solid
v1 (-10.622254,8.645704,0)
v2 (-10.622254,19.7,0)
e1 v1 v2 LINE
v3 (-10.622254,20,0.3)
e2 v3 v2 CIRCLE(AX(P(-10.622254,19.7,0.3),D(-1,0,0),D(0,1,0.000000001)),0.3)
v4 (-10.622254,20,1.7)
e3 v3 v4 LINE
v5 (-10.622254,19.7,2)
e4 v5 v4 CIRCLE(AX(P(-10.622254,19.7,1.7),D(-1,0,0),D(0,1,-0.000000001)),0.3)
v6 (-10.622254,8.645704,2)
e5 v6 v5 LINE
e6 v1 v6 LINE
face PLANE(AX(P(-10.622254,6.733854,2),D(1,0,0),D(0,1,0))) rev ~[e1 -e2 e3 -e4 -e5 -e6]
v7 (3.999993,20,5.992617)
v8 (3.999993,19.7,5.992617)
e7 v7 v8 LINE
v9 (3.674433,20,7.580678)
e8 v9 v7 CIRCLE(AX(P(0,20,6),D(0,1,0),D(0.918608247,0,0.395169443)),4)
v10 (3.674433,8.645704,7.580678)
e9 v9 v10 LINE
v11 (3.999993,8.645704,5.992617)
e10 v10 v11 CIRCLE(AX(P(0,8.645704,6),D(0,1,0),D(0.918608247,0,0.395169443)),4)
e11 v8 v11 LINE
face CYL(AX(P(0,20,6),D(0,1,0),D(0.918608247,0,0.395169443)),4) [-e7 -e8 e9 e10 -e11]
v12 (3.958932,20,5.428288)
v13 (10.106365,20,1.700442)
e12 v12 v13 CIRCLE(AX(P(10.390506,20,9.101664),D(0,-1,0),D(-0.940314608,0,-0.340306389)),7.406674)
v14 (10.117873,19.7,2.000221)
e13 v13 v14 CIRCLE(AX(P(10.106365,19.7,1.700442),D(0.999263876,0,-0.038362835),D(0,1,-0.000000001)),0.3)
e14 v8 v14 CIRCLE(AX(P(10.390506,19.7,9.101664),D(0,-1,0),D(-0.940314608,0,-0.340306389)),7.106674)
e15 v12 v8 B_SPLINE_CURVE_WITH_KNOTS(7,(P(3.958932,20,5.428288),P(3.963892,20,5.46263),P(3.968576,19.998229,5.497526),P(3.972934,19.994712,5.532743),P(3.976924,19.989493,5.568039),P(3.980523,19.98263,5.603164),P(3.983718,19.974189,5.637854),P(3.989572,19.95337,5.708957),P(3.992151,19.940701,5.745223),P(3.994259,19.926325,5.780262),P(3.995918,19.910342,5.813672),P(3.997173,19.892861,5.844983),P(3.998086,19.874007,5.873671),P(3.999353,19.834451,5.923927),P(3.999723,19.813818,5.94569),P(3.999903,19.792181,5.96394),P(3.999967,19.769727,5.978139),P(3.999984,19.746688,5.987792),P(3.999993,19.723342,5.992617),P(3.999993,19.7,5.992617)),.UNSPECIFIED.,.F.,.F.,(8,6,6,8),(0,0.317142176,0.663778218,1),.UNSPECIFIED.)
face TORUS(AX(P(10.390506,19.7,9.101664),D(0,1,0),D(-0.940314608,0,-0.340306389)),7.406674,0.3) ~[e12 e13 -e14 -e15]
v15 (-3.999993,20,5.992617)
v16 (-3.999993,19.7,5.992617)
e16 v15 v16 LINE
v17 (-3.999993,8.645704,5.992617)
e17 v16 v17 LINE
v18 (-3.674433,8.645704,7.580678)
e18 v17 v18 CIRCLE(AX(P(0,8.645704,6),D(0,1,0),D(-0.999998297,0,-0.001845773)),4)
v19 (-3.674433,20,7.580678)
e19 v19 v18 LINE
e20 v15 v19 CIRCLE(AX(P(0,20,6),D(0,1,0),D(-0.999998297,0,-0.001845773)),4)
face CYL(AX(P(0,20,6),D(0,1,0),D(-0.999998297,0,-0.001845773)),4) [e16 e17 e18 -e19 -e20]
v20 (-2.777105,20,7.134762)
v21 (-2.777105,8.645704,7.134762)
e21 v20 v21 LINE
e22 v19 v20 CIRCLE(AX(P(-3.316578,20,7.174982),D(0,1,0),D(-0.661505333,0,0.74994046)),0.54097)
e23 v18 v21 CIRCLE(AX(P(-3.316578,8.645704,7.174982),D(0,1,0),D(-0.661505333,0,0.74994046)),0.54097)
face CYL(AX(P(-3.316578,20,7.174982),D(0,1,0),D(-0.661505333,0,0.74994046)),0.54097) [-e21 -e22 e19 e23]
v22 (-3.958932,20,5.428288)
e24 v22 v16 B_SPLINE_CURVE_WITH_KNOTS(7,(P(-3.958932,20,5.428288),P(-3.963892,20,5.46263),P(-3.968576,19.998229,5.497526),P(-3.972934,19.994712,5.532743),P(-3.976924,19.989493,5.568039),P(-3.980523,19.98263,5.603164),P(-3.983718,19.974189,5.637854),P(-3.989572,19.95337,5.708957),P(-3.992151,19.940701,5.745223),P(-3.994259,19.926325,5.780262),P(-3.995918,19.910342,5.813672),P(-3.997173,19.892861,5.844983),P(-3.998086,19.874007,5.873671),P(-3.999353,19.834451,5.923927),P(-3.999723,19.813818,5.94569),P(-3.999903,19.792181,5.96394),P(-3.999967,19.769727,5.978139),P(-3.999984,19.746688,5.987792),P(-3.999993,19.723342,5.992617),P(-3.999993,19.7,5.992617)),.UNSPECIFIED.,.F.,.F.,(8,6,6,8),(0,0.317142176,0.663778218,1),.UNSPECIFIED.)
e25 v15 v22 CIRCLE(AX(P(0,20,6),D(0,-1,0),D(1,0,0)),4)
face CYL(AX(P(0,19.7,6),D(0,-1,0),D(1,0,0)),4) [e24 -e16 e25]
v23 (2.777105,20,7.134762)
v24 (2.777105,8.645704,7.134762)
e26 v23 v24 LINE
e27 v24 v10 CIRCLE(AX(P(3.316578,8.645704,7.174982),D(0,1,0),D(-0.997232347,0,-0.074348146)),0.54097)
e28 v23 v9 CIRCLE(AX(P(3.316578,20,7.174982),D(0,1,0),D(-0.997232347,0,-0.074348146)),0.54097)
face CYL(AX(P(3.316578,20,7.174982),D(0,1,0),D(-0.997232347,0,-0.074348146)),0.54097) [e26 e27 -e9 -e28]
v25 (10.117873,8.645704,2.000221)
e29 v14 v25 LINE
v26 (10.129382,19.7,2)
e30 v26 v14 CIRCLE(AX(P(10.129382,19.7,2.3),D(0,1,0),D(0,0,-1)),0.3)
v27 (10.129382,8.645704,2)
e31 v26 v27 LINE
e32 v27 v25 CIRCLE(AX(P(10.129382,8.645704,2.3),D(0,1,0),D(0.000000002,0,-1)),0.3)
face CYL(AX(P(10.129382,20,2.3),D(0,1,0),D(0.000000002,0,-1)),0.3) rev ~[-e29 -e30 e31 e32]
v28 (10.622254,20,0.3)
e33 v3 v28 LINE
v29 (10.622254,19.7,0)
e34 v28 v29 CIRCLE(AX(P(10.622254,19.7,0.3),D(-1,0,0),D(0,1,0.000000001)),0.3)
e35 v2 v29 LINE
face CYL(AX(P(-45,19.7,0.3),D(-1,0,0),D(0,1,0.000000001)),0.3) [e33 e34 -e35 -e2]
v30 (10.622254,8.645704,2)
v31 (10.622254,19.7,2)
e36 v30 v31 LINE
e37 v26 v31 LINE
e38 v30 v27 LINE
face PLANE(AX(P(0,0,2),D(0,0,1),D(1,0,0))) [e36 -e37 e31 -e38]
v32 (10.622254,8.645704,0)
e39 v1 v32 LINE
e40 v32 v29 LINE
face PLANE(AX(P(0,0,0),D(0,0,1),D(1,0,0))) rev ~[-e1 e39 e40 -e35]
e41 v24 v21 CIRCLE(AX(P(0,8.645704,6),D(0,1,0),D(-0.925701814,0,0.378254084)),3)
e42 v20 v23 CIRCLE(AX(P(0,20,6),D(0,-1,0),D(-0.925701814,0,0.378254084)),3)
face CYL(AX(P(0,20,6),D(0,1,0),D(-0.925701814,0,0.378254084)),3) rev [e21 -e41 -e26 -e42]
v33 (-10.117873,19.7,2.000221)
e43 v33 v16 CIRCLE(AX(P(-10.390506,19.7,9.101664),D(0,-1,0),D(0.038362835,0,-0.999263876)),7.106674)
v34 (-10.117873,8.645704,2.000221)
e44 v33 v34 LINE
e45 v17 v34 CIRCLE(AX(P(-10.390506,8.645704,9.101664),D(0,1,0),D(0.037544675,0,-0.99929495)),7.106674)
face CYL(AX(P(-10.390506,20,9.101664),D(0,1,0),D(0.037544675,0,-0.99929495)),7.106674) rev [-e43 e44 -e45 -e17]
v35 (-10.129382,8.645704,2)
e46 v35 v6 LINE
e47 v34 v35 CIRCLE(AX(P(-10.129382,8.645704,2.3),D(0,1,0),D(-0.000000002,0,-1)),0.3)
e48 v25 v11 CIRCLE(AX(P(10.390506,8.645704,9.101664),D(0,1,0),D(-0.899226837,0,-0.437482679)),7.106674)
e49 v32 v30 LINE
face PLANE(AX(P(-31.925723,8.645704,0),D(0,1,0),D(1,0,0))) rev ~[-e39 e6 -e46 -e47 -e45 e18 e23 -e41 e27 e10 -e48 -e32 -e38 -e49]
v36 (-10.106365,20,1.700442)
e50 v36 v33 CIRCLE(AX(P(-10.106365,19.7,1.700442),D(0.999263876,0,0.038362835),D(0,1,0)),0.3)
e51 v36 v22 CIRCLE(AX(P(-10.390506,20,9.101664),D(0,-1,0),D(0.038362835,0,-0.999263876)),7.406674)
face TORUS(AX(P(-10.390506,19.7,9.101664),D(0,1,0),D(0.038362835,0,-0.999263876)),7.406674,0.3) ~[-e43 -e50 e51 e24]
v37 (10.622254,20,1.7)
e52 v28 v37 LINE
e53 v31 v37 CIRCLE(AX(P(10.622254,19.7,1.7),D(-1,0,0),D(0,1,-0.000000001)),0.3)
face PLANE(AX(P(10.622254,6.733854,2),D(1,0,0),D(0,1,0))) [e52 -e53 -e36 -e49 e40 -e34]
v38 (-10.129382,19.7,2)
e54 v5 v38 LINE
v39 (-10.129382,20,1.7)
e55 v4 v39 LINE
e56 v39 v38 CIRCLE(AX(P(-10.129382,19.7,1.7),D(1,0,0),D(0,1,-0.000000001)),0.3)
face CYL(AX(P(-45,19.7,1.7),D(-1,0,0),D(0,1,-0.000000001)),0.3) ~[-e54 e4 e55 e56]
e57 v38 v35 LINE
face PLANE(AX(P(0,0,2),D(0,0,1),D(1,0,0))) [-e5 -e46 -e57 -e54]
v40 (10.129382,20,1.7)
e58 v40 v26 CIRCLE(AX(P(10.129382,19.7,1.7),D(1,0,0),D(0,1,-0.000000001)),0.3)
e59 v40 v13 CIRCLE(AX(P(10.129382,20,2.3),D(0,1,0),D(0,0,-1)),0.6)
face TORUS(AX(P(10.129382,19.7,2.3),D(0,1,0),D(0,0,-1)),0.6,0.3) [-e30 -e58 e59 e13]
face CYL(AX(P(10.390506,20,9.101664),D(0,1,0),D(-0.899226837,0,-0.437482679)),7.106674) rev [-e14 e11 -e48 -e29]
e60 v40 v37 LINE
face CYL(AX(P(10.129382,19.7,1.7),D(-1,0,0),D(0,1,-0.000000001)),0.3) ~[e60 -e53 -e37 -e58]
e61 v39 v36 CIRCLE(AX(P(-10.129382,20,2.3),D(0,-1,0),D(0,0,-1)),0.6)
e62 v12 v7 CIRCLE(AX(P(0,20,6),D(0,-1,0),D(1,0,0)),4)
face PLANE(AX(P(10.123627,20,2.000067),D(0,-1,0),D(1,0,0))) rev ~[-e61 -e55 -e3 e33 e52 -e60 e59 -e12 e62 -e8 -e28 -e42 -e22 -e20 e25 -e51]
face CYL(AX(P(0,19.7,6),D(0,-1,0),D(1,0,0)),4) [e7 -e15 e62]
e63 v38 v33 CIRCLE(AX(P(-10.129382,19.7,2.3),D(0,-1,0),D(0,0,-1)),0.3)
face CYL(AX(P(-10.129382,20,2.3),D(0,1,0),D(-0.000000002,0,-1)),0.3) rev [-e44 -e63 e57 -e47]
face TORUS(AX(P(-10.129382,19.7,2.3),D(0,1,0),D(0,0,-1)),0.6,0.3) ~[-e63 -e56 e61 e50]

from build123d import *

# Parameters (mm, degrees)
F1_DEPTH     = 2
F3_DEPTH     = 40
F4_T1_DEPTH  = 40
F4_T3_DEPTH  = 90
F4_T5_DEPTH  = 20
F4_T8_ANGLE  = 90
F4_T10_ANGLE = 90
F4_T12_ANGLE = 90
F4_T14_ANGLE = 90
F4_T15_DEPTH = 20
F4_T17_DEPTH = 34.8706177507
F4_T19_DEPTH = 34.8706177507
F4_T22_ANGLE = 90
F4_T24_ANGLE = 90
F4_T26_ANGLE = 90
F4_T28_ANGLE = 90
F4_T32_ANGLE = 67.9058899257
F4_S33_R     = 4
F4_T34_DEPTH = 6
F4_T38_ANGLE = 67.9058899257
F4_S39_R     = 4
F4_T40_DEPTH = 6
F4_T42_ANGLE = 2.1985680139
F4_T44_ANGLE = 2.1985680139
F4_T46_ANGLE = 145.4380511244
F4_T48_ANGLE = 145.4380511244
F5_W         = 47.7962438017
F5_H         = 14.3843935803
F6_DEPTH     = 25
F7_W         = 52.0751457661
F7_H         = 31.3179213554
F8_DEPTH     = 25


# Not quite as in the source:
# - a fillet or chamfer that OpenCascade refuses, or shapes differently, is made with other operations: its cross-section is extruded or revolved along the edge and cut away or added


with BuildPart() as f1:
    # F0 (on Top) → F1 (new body)
    with BuildSketch(Plane.XY):
        with BuildLine():
            Line((45, 20), (-45, 20))
            ThreePointArc((-45, 20), (-52.0710678119, 17.0710678119), (-55, 10))
            Line((-55, 10), (-55, -10))
            ThreePointArc((-55, -10), (-52.0710678119, -17.0710678119), (-45, -20))
            Line((-45, -20), (45, -20))
            ThreePointArc((45, -20), (52.0710678119, -17.0710678119), (55, -10))
            Line((55, -10), (55, 10))
            ThreePointArc((55, 10), (52.0710678119, 17.0710678119), (45, 20))
        make_face()
    extrude(amount=F1_DEPTH)

    # F2 (on face) → F3 (join, through all)
    with BuildSketch(Plane(origin=(0, 20, 0), x_dir=(-1, 0, 0), z_dir=(0, 1, 0))):
        with BuildLine():
            ThreePointArc((2.7771054409, 7.1347622527), (0, 3), (-2.7771054409, 7.1347622527))
            ThreePointArc((-2.7771054409, 7.1347622527), (-3.0758368725, 7.6594328143), (-3.674432988, 7.5806777712))
            ThreePointArc((-3.674432988, 7.5806777712), (-3.9185059144, 6.8033127653), (-3.9999931862, 5.9926169097))
            ThreePointArc((-3.9999931862, 5.9926169097), (-6.509106512, 3.1485501635), (-10.1236877963, 2))
            Line((-10.1236877963, 2), (10.1236877963, 2))
            ThreePointArc((10.1236877963, 2), (6.509106512, 3.1485501635), (3.9999931862, 5.9926169097))
            ThreePointArc((3.9999931862, 5.9926169097), (3.9185059144, 6.8033127653), (3.674432988, 7.5806777712))
            ThreePointArc((3.674432988, 7.5806777712), (3.0758368725, 7.6594328143), (2.7771054409, 7.1347622527))
        make_face()
    extrude(amount=-F3_DEPTH)

    # F4: fillet of radius 0.3 on 22 edges, made by hand

    # F4_s2 → F4_t1 (join)
    with BuildSketch(Plane.XZ.offset(-20)):
        with BuildLine():
            ThreePointArc((10.1293822493, 2), (10.1236267648, 2.0000552144), (10.1178733989, 2.0002208373))
            ThreePointArc((10.1178733989, 2.0002208373), (10.120780575, 2.0001098236), (10.1236877963, 2))
            Line((10.1236877963, 2), (10.1293822493, 2))
        make_face()
        with BuildLine():
            ThreePointArc((-10.1293822493, 2), (-10.1236267648, 2.0000552144), (-10.1178733989, 2.0002208373))
            ThreePointArc((-10.1178733989, 2.0002208373), (-10.120780575, 2.0001098236), (-10.1236877963, 2))
            Line((-10.1236877963, 2), (-10.1293822493, 2))
        make_face()
    extrude(amount=F4_T1_DEPTH)

    # F4_s4 → F4_t3 (cut)
    with BuildSketch(Plane.YZ.offset(-45)):
        with BuildLine():
            ThreePointArc((20, 0.3), (19.9121320344, 0.0878679656), (19.7, 0))
            Line((19.7, 0), (20, 0))
            Line((20, 0), (20, 0.3))
        make_face()
        with BuildLine():
            ThreePointArc((-19.7, 0), (-19.9121320344, 0.0878679656), (-20, 0.3))
            Line((-20, 0.3), (-20, 0))
            Line((-20, 0), (-19.7, 0))
        make_face()
    extrude(amount=F4_T3_DEPTH, mode=Mode.SUBTRACT)

    # F4_s6 → F4_t5 (cut)
    with BuildSketch(Plane.XZ.offset(-10)):
        with BuildLine():
            ThreePointArc((-54.7, 0), (-54.9121320344, 0.0878679656), (-55, 0.3))
            Line((-55, 0.3), (-55, 0))
            Line((-55, 0), (-54.7, 0))
        make_face()
        with BuildLine():
            ThreePointArc((54.7, 0), (54.9121320344, 0.0878679656), (55, 0.3))
            Line((55, 0.3), (55, 0))
            Line((55, 0), (54.7, 0))
        make_face()
    extrude(amount=F4_T5_DEPTH, mode=Mode.SUBTRACT)

    # F4_s7 → F4_t8 (revolve, cut)
    with BuildSketch(Plane.YZ.offset(-45)):
        with BuildLine():
            ThreePointArc((20, 0.3), (19.9121320344, 0.0878679656), (19.7, 0))
            Line((19.7, 0), (20, 0))
            Line((20, 0), (20, 0.3))
        make_face()
    revolve(axis=Axis((-45, 10, 0), (0, 0, 1)), revolution_arc=F4_T8_ANGLE, mode=Mode.SUBTRACT)

    # F4_s9 → F4_t10 (revolve, cut)
    with BuildSketch(Plane.XZ.offset(10)):
        with BuildLine():
            ThreePointArc((-54.7, 0), (-54.9121320344, 0.0878679656), (-55, 0.3))
            Line((-55, 0.3), (-55, 0))
            Line((-55, 0), (-54.7, 0))
        make_face()
    revolve(axis=Axis((-45, -10, 0), (0, 0, 1)), revolution_arc=F4_T10_ANGLE, mode=Mode.SUBTRACT)

    # F4_s11 → F4_t12 (revolve, cut)
    with BuildSketch(Plane.YZ.offset(45)):
        with BuildLine():
            ThreePointArc((-19.7, 0), (-19.9121320344, 0.0878679656), (-20, 0.3))
            Line((-20, 0.3), (-20, 0))
            Line((-20, 0), (-19.7, 0))
        make_face()
    revolve(axis=Axis((45, -10, 0), (0, 0, 1)), revolution_arc=F4_T12_ANGLE, mode=Mode.SUBTRACT)

    # F4_s13 → F4_t14 (revolve, cut)
    with BuildSketch(Plane.XZ.offset(-10)):
        with BuildLine():
            ThreePointArc((55, 0.3), (54.9121320344, 0.0878679656), (54.7, 0))
            Line((54.7, 0), (55, 0))
            Line((55, 0), (55, 0.3))
        make_face()
    revolve(axis=Axis((45, 10, 0), (0, 0, 1)), revolution_arc=F4_T14_ANGLE, mode=Mode.SUBTRACT)

    # F4_s16 → F4_t15 (cut)
    with BuildSketch(Plane.XZ.offset(-10)):
        with BuildLine():
            ThreePointArc((54.7, 2), (54.9121320344, 1.9121320344), (55, 1.7))
            Line((55, 1.7), (55, 2))
            Line((55, 2), (54.7, 2))
        make_face()
        with BuildLine():
            ThreePointArc((-54.7, 2), (-54.9121320344, 1.9121320344), (-55, 1.7))
            Line((-55, 1.7), (-55, 2))
            Line((-55, 2), (-54.7, 2))
        make_face()
    extrude(amount=F4_T15_DEPTH, mode=Mode.SUBTRACT)

    # F4_s18 → F4_t17 (cut)
    with BuildSketch(Plane.YZ.offset(10.1293822493)):
        with BuildLine():
            ThreePointArc((-19.7, 2), (-19.9121320344, 1.9121320344), (-20, 1.7))
            Line((-20, 1.7), (-20, 2))
            Line((-20, 2), (-19.7, 2))
        make_face()
        with BuildLine():
            ThreePointArc((20, 1.7), (19.9121320344, 1.9121320344), (19.7, 2))
            Line((19.7, 2), (20, 2))
            Line((20, 2), (20, 1.7))
        make_face()
    extrude(amount=F4_T17_DEPTH, mode=Mode.SUBTRACT)

    # F4_s20 → F4_t19 (cut)
    with BuildSketch(Plane.YZ.offset(-45)):
        with BuildLine():
            ThreePointArc((-19.7, 2), (-19.9121320344, 1.9121320344), (-20, 1.7))
            Line((-20, 1.7), (-20, 2))
            Line((-20, 2), (-19.7, 2))
        make_face()
        with BuildLine():
            ThreePointArc((20, 1.7), (19.9121320344, 1.9121320344), (19.7, 2))
            Line((19.7, 2), (20, 2))
            Line((20, 2), (20, 1.7))
        make_face()
    extrude(amount=F4_T19_DEPTH, mode=Mode.SUBTRACT)

    # F4_s21 → F4_t22 (revolve, cut)
    with BuildSketch(Plane.XZ.offset(-10)):
        with BuildLine():
            ThreePointArc((54.7, 2), (54.9121320344, 1.9121320344), (55, 1.7))
            Line((55, 1.7), (55, 2))
            Line((55, 2), (54.7, 2))
        make_face()
    revolve(axis=Axis((45, 10, 2), (0, 0, 1)), revolution_arc=F4_T22_ANGLE, mode=Mode.SUBTRACT)

    # F4_s23 → F4_t24 (revolve, cut)
    with BuildSketch(Plane.YZ.offset(45)):
        with BuildLine():
            ThreePointArc((-19.7, 2), (-19.9121320344, 1.9121320344), (-20, 1.7))
            Line((-20, 1.7), (-20, 2))
            Line((-20, 2), (-19.7, 2))
        make_face()
    revolve(axis=Axis((45, -10, 2), (0, 0, 1)), revolution_arc=F4_T24_ANGLE, mode=Mode.SUBTRACT)

    # F4_s25 → F4_t26 (revolve, cut)
    with BuildSketch(Plane.XZ.offset(10)):
        with BuildLine():
            ThreePointArc((-54.7, 2), (-54.9121320344, 1.9121320344), (-55, 1.7))
            Line((-55, 1.7), (-55, 2))
            Line((-55, 2), (-54.7, 2))
        make_face()
    revolve(axis=Axis((-45, -10, 2), (0, 0, 1)), revolution_arc=F4_T26_ANGLE, mode=Mode.SUBTRACT)

    # F4_s27 → F4_t28 (revolve, cut)
    with BuildSketch(Plane.YZ.offset(-45)):
        with BuildLine():
            ThreePointArc((20, 1.7), (19.9121320344, 1.9121320344), (19.7, 2))
            Line((19.7, 2), (20, 2))
            Line((20, 2), (20, 1.7))
        make_face()
    revolve(axis=Axis((-45, 10, 2), (0, 0, 1)), revolution_arc=F4_T28_ANGLE, mode=Mode.SUBTRACT)


with BuildPart() as f4_tool30:
    # F4_s31 → F4_t32 (revolve)
    with BuildSketch(Plane(origin=(-1.7091793366, 0, 4.7227038559), x_dir=(0, 1, 0), z_dir=(-0.3403063894, 0, 0.9403146076))):
        with BuildLine():
            ThreePointArc((20, -5.4610241004), (19.9121320344, -5.6731561348), (19.7, -5.7610241004))
            Line((19.7, -5.7610241004), (20, -5.7610241004))
            Line((20, -5.7610241004), (20, -5.4610241004))
        make_face()
    revolve(axis=Axis((10.3905055755, 20, 9.1016638887), (0, -1, 0)), revolution_arc=F4_T32_ANGLE)

    # F4_s33 → F4_t34 (cut, symmetric)
    with BuildSketch(Plane.XZ.offset(-19.7)):
        with Locations((0, 6)):
            Circle(F4_S33_R)
    extrude(amount=F4_T34_DEPTH, both=True, mode=Mode.SUBTRACT)


with BuildPart() as f1_1:
    add(f1.part)

    # F4_t29: cut F4_tool30
    add(f4_tool30.part, mode=Mode.SUBTRACT)


with BuildPart() as f4_tool36:
    # F4_s37 → F4_t38 (revolve)
    with BuildSketch(Plane(origin=(-10.0263051977, 0, -0.3849208379), x_dir=(0, 1, 0), z_dir=(-0.9992638755, 0, -0.0383628346))):
        with BuildLine():
            ThreePointArc((20, -2.0868987298), (19.9121320344, -2.2990307641), (19.7, -2.3868987298))
            Line((19.7, -2.3868987298), (20, -2.3868987298))
            Line((20, -2.3868987298), (20, -2.0868987298))
        make_face()
    revolve(axis=Axis((-10.3905055755, 20, 9.1016638887), (0, -1, 0)), revolution_arc=F4_T38_ANGLE)

    # F4_s39 → F4_t40 (cut, symmetric)
    with BuildSketch(Plane.XZ.offset(-19.7)):
        with Locations((0, 6)):
            Circle(F4_S39_R)
    extrude(amount=F4_T40_DEPTH, both=True, mode=Mode.SUBTRACT)


with BuildPart() as f1_2:
    add(f1_1.part)

    # F4_t35: cut F4_tool36
    add(f4_tool36.part, mode=Mode.SUBTRACT)

    # F4_s41 → F4_t42 (revolve, cut)
    with BuildSketch(Plane.YZ.offset(-10.1293822493)):
        with BuildLine():
            ThreePointArc((20, 1.7), (19.9121320344, 1.9121320344), (19.7, 2))
            Line((19.7, 2), (20, 2))
            Line((20, 2), (20, 1.7))
        make_face()
    revolve(axis=Axis((-10.1293822493, 20, 2.3), (0, -1, 0)), revolution_arc=F4_T42_ANGLE, mode=Mode.SUBTRACT)

    # F4_s43 → F4_t44 (revolve, cut)
    with BuildSketch(Plane.YZ.offset(10.1293822493)):
        with BuildLine():
            ThreePointArc((20, 1.7), (19.9121320344, 1.9121320344), (19.7, 2))
            Line((19.7, 2), (20, 2))
            Line((20, 2), (20, 1.7))
        make_face()
    revolve(axis=Axis((10.1293822493, 20, 2.3), (0, 1, 0)), revolution_arc=F4_T44_ANGLE, mode=Mode.SUBTRACT)

    # F4_s45 → F4_t46 (revolve, cut)
    with BuildSketch(Plane.YZ.offset(-10.1293822493)):
        with BuildLine():
            ThreePointArc((-19.7, 2), (-19.9121320344, 1.9121320344), (-20, 1.7))
            Line((-20, 1.7), (-20, 2))
            Line((-20, 2), (-19.7, 2))
        make_face()
    revolve(axis=Axis((-10.1293822493, -20, 2.3), (0, -1, 0)), revolution_arc=F4_T46_ANGLE, mode=Mode.SUBTRACT)

    # F4_s47 → F4_t48 (revolve, cut)
    with BuildSketch(Plane.YZ.offset(10.1293822493)):
        with BuildLine():
            ThreePointArc((-19.7, 2), (-19.9121320344, 1.9121320344), (-20, 1.7))
            Line((-20, 1.7), (-20, 2))
            Line((-20, 2), (-19.7, 2))
        make_face()
    revolve(axis=Axis((10.1293822493, -20, 2.3), (0, 1, 0)), revolution_arc=F4_T48_ANGLE, mode=Mode.SUBTRACT)

    # F5 (on face) → F6 (cut)
    with BuildSketch(Plane.XY.offset(2)):
        with Locations((-34.5203755423, 13.9260510914)):
            Rectangle(F5_W, F5_H)
        Polygon((-10.6222536415, 6.7338543013), (-58.4184974432, 6.7338543013), (-58.4184974432, -28.1346440315), (65.8517405391, -28.1346440315), (65.8517405391, 6.7338543013), (58.4184974432, 6.7338543013), (10.6222536415, 6.7338543013), align=None)
        with Locations((34.5203755423, 13.9260510914)):
            Rectangle(F5_W, F5_H)
    extrude(amount=-F6_DEPTH, mode=Mode.SUBTRACT)

    # F7 (on Top) → F8 (cut)
    with BuildSketch(Plane.XY):
        with Locations((-5.8881500736, -7.0132566616)):
            Rectangle(F7_W, F7_H)
    extrude(amount=F8_DEPTH, mode=Mode.SUBTRACT)


solid = f1_2.part
